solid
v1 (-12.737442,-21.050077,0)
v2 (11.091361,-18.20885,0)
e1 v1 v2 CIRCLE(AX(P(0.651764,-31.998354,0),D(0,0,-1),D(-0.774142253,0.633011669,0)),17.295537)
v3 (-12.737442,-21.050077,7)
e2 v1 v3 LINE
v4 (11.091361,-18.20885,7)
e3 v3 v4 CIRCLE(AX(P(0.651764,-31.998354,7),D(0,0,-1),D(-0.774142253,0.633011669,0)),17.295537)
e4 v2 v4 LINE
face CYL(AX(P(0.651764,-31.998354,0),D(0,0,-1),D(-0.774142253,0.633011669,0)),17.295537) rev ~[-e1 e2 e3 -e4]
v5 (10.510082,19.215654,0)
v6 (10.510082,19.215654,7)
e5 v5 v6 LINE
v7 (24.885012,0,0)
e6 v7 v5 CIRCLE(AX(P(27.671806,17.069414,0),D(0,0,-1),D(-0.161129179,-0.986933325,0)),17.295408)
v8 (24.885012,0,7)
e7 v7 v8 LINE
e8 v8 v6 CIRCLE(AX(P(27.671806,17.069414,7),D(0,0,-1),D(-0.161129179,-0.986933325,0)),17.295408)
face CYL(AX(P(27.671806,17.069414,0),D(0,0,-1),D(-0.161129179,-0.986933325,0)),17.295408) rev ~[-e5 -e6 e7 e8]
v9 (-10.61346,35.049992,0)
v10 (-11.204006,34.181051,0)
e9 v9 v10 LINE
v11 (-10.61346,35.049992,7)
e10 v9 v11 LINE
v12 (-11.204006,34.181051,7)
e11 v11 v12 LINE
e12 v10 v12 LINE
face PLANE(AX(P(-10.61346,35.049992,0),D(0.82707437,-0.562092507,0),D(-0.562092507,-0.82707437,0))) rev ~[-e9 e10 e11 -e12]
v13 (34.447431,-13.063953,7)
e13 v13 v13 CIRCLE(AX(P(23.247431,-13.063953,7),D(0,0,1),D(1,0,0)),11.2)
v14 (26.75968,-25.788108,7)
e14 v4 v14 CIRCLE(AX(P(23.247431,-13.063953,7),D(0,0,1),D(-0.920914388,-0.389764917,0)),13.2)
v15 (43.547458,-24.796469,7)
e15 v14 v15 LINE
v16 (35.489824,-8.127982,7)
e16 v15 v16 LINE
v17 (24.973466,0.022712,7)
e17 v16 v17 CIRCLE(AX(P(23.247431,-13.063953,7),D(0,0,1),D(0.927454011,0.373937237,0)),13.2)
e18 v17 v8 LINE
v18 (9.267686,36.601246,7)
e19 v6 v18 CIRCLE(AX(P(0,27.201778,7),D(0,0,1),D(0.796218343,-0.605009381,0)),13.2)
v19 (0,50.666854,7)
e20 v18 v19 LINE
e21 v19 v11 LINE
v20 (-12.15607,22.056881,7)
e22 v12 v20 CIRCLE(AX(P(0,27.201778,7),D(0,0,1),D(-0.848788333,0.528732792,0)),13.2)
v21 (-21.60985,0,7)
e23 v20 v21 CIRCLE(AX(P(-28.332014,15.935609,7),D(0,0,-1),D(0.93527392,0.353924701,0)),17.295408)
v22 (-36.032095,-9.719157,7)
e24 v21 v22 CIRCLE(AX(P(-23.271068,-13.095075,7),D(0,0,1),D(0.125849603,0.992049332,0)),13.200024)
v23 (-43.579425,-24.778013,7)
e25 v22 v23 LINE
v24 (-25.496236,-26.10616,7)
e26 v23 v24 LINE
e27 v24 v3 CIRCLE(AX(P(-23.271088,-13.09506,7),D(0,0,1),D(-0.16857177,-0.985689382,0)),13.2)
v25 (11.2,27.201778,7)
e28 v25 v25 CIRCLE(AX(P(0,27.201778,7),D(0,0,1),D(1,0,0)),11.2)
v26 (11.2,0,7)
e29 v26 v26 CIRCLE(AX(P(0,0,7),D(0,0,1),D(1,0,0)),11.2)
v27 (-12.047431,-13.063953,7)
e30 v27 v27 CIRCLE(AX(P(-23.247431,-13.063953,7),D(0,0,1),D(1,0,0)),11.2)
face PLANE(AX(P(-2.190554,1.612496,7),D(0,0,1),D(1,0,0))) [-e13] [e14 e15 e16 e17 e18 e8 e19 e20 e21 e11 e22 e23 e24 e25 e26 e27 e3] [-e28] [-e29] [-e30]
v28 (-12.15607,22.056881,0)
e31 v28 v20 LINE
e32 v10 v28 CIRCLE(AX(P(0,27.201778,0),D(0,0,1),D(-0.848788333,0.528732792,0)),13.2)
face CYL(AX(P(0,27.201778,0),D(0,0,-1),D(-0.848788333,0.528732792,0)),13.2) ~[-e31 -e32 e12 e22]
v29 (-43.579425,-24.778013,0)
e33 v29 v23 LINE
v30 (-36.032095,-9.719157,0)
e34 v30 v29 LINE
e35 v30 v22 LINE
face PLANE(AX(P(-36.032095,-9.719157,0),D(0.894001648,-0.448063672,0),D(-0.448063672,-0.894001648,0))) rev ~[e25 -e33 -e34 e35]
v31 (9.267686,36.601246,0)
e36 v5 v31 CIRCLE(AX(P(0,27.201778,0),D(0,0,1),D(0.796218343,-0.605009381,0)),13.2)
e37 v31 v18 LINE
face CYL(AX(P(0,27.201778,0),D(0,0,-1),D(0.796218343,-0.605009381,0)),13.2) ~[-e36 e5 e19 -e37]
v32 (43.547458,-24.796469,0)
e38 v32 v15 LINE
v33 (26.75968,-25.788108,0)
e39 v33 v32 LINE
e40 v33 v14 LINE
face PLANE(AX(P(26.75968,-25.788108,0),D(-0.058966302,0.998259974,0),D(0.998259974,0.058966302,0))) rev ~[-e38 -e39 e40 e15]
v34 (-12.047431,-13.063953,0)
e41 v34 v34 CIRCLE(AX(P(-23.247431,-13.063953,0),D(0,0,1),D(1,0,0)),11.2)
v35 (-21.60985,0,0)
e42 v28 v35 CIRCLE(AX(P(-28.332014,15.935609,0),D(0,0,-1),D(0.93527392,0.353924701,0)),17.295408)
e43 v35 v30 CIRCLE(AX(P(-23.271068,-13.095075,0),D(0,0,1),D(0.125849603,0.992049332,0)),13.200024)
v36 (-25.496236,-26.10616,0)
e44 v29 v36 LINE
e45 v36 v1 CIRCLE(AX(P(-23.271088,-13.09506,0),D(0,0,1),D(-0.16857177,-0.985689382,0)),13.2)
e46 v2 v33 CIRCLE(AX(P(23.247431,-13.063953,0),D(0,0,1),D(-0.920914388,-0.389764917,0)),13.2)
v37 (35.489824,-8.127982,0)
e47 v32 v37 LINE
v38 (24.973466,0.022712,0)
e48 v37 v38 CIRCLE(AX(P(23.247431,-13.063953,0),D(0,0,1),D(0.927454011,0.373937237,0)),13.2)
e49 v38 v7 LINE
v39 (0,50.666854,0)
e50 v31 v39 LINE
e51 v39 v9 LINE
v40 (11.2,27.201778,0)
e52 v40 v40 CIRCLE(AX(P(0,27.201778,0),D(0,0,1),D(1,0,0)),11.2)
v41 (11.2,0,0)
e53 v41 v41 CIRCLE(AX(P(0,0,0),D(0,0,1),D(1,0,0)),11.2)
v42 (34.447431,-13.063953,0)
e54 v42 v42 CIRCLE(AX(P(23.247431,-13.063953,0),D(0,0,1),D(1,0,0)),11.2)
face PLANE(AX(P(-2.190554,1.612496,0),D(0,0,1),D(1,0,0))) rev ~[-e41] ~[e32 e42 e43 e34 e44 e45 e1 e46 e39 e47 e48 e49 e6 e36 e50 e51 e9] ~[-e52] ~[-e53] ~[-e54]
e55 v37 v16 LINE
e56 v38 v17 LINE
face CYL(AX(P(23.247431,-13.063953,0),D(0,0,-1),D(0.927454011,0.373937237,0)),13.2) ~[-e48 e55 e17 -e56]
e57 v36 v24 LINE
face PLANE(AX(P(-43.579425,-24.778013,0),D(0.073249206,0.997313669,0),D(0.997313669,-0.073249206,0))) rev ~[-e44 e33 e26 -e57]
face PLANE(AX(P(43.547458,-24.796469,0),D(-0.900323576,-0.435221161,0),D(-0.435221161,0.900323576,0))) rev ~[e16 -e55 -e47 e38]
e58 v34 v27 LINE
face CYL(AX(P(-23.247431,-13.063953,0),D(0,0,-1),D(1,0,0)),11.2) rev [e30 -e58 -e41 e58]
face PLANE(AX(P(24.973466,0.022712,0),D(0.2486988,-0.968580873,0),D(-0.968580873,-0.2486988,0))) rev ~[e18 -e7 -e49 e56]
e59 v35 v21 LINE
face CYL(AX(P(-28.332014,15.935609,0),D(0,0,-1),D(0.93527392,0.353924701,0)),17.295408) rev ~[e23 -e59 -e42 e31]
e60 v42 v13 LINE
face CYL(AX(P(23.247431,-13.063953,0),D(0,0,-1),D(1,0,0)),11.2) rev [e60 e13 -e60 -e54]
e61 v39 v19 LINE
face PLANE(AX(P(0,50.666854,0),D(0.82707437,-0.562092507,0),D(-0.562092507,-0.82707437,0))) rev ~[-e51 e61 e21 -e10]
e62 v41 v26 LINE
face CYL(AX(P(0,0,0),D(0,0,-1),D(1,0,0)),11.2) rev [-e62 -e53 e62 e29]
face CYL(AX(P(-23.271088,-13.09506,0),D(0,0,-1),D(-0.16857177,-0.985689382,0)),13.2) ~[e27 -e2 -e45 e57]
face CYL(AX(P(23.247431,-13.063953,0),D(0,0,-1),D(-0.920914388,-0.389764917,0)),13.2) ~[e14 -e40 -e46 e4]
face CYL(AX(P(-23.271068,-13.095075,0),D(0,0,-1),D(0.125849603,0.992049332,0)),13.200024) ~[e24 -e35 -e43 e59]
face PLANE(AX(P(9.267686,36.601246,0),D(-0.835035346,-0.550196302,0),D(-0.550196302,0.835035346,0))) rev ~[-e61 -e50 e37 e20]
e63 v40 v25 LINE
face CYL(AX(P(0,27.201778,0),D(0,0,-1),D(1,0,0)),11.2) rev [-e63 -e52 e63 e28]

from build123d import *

# Parameters (mm, degrees)
F0_R     = 11.2
F1_DEPTH = 7


# Not quite as in the source:
# - ends of sketch curves that miss each other by under 0.0002 mm in the source are joined


with BuildPart() as f1:
    # F0 (on Top) → F1 (new body)
    with BuildSketch(Plane.XY):
        with BuildLine():
            ThreePointArc((24.885011592, 0), (13.8227560246, 6.7091569655), (10.5100821241, 19.2156543591))
            ThreePointArc((10.5100821241, 19.2156543591), (13.1664242497, 28.1426673783), (9.267685926, 36.601246125))
            Line((9.267685926, 36.601246125), (0, 50.6668537855))
            Line((0, 50.6668537855), (-10.6134602306, 35.0499921165))
            Line((-10.6134602306, 35.0499921165), (-11.2040059959, 34.1810510431))
            ThreePointArc((-11.2040059959, 34.1810510431), (-13.1594893438, 28.235141726), (-12.1560699163, 22.0568812763))
            ThreePointArc((-12.1560699163, 22.0568812763), (-12.4352425028, 9.122108449), (-21.6098500078, 0))
            ThreePointArc((-21.6098500078, 0), (-30.6478922927, -2.1487015261), (-36.0320947169, -9.7191574841))
            Line((-36.0320947169, -9.7191574841), (-43.5794253076, -24.7780127605))
            Line((-43.5794253076, -24.7780127605), (-25.4962357758, -26.1061598733))
            ThreePointArc((-25.4962357758, -26.1061598733), (-18.4080870059, -25.3666213531), (-12.7374420281, -21.0500769317))
            ThreePointArc((-12.7374420281, -21.0500769317), (-1.3959205219, -14.82446107), (11.0913608835, -18.2088500145))
            ThreePointArc((11.0913608835, -18.2088500145), (17.4993705689, -24.9467054642), (26.7596797789, -25.7881075822))
            ThreePointArc((26.7596797789, -25.7881075822), (35.0805283727, -18.9135515404), (35.4898237471, -8.127981579))
            ThreePointArc((35.4898237471, -8.127981579), (31.3336966338, -2.63072231), (24.9734656325, 0.0227120051))
            Line((24.9734656325, 0.0227120051), (24.885011592, 0))
        make_face()
        with Locations((-23.2474307999, -13.063953107)):
            Circle(F0_R, mode=Mode.SUBTRACT)
        with Locations((23.2474307999, -13.063953107)):
            Circle(F0_R, mode=Mode.SUBTRACT)
        Circle(F0_R, mode=Mode.SUBTRACT)
        with Locations((0, 27.2017781838)):
            Circle(F0_R, mode=Mode.SUBTRACT)
        with BuildLine():
            Line((43.5474583602, -24.7964688862), (35.4898237471, -8.127981579))
            ThreePointArc((35.4898237471, -8.127981579), (35.0805283727, -18.9135515404), (26.7596797789, -25.7881075822))
            Line((26.7596797789, -25.7881075822), (43.5474583602, -24.7964688862))
        make_face()
    extrude(amount=F1_DEPTH)


solid = f1.part
